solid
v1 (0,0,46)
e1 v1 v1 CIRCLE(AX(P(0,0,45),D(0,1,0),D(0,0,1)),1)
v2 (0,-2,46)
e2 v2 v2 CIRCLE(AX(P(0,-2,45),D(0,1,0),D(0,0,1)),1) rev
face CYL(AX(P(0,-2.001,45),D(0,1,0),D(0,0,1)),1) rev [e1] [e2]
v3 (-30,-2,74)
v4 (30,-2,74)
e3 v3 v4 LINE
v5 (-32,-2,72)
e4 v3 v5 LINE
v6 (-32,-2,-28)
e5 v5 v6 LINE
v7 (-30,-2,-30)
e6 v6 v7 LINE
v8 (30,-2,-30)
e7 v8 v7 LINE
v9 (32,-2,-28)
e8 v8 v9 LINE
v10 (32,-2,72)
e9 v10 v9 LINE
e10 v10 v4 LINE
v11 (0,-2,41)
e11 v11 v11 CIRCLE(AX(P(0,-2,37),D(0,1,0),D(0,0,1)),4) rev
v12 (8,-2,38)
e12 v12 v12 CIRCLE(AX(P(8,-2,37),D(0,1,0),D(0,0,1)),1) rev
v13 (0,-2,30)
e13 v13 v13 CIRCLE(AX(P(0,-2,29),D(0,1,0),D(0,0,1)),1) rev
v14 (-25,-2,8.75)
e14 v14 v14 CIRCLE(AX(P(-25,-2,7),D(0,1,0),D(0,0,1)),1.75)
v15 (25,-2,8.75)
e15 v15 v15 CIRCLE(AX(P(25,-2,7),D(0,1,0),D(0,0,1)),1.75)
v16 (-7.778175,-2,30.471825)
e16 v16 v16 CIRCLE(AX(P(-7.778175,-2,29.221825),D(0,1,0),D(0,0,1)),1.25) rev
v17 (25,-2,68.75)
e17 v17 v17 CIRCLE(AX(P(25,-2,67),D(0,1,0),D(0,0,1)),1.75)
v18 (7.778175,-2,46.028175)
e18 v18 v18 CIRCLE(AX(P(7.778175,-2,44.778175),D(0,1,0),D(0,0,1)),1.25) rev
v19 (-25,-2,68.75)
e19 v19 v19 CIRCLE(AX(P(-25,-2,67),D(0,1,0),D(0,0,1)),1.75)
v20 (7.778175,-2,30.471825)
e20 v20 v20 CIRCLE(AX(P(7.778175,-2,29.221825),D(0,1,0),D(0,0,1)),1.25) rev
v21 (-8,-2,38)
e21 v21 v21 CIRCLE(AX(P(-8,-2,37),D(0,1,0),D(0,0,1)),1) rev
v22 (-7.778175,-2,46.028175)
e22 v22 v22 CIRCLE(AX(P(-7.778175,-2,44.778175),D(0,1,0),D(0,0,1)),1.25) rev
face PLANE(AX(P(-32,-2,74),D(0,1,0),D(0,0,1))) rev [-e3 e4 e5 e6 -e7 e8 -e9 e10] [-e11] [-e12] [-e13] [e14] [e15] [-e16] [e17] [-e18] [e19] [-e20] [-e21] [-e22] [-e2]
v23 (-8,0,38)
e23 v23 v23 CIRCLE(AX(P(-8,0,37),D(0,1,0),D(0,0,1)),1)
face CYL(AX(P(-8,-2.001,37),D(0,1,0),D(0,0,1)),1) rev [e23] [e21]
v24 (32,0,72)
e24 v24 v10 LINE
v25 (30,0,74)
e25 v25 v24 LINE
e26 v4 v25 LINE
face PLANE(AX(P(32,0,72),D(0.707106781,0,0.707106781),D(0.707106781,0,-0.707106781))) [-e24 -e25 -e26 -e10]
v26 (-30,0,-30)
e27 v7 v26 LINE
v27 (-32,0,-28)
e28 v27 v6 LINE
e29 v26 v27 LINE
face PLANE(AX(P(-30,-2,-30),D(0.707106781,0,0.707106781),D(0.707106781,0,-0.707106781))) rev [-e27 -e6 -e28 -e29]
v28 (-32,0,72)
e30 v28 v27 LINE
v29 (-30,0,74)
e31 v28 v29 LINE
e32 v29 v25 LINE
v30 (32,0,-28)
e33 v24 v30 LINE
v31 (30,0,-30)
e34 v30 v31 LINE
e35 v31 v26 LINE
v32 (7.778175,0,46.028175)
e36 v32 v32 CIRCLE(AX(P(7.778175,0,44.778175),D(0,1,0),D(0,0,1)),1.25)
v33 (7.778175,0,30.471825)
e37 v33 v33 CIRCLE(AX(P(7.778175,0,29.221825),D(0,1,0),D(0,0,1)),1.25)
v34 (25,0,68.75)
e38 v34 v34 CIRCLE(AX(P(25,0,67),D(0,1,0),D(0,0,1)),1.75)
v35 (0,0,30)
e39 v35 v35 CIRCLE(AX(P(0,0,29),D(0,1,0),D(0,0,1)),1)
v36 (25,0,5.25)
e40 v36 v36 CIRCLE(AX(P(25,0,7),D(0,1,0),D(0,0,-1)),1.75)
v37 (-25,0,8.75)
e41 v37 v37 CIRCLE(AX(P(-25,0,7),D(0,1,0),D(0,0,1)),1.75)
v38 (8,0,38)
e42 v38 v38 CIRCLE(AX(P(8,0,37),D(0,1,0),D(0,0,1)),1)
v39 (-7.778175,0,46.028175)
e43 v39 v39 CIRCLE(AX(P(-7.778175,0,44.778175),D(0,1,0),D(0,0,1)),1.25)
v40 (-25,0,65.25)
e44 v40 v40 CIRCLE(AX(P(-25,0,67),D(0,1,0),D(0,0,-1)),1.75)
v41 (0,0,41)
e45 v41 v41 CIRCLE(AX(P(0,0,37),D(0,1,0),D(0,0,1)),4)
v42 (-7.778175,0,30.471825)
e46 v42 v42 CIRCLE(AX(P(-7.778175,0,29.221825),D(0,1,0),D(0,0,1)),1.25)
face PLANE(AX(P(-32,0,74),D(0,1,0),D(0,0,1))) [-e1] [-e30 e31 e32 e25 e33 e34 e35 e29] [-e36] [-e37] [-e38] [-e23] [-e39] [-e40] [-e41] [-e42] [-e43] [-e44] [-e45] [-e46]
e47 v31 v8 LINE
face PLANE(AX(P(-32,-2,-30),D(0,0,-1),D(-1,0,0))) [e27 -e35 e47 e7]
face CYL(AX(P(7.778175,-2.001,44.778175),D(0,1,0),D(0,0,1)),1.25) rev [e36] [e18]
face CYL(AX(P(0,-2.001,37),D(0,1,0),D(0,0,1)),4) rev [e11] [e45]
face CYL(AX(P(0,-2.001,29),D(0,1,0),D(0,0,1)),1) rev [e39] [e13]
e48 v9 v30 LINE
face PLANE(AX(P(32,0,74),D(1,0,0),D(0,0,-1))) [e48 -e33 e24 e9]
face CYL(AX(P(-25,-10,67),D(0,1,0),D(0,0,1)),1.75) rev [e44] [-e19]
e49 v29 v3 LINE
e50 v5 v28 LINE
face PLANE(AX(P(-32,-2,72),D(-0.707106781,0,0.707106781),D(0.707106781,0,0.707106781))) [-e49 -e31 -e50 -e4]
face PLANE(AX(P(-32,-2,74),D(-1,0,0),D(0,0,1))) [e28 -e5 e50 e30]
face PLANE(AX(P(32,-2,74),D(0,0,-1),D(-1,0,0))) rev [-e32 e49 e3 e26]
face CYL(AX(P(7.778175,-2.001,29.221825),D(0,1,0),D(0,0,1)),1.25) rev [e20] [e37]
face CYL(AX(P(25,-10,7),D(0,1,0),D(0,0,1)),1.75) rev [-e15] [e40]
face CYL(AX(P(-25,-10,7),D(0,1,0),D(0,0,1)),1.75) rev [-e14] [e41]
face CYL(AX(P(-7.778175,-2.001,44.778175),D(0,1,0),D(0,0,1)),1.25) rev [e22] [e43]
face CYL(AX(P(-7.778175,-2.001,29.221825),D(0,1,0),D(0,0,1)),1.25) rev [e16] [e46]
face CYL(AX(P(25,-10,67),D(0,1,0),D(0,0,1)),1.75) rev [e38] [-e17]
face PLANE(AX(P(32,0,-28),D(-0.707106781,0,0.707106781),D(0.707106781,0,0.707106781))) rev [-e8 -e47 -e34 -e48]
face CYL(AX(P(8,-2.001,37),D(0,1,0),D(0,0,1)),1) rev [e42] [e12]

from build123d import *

# Parameters (mm, degrees)
SKETCH1_W          = 64
SKETCH1_H          = 2
BASE_FLANGE1_DEPTH = 74
SKETCH2_R          = 1.75
CUT_EXTRUDE1_DEPTH = 10
CUT_EXTRUDE2_REACH = 82.647
SKETCH4_R          = 4
CHAMFER1_SIZE      = 2
CUT_EXTRUDE5_REACH = 82.647
SKETCH7_R          = 1
SKETCH7_R_2        = 1.25
SKETCH8_W          = 64
SKETCH8_H          = 30
TAB1_DEPTH         = 2
CHAMFER2_SIZE      = 2


# Sheet-metal steps are written as plain solids
with BuildPart() as part:
    # Sketch1 → Base-Flange1 (new body)
    with BuildSketch(Plane.XY):
        with Locations((0, -1)):
            Rectangle(SKETCH1_W, SKETCH1_H)
    extrude(amount=BASE_FLANGE1_DEPTH)

    # Sketch2 → Cut-Extrude1 (cut)
    with BuildSketch(Plane(origin=(0, 0, 0), x_dir=(1, 0, 0), z_dir=(0, 1, 0))):
        with Locations(Location((-25, -7, 0), (0, 0, 270))):
            Circle(SKETCH2_R)
        with Locations(Location((-25, -67, 0), (0, 0, 270))):
            Circle(SKETCH2_R)
        with Locations(Location((25, -67, 0), (0, 0, 270))):
            Circle(SKETCH2_R)
        with Locations(Location((25, -7, 0), (0, 0, 270))):
            Circle(SKETCH2_R)
    extrude(amount=-CUT_EXTRUDE1_DEPTH, mode=Mode.SUBTRACT)

    # Sketch4 → Cut-Extrude2 (cut, up to next)
    with BuildSketch(Plane(origin=(0, 0, 0), x_dir=(1, 0, 0), z_dir=(0, 1, 0)), mode=Mode.PRIVATE) as cut_extrude2_sk1:
        with Locations(Location((0, -37, 0), (0, 0, 270))):
            Circle(SKETCH4_R)
    cut_extrude2_tool1 = extrude(cut_extrude2_sk1.sketch, amount=-CUT_EXTRUDE2_REACH, mode=Mode.PRIVATE) & part.part
    add(cut_extrude2_tool1.solids().sort_by_distance((0, 0, 37))[0], mode=Mode.SUBTRACT)

    # Chamfer1
    chamfer1_edges = [part.edges().sort_by_distance(p)[0] for p in [
        (-32, -1, 74),
        (32, -1, 74),
    ]]
    chamfer(chamfer1_edges, length=CHAMFER1_SIZE)

    # Sketch7 → Cut-Extrude5 (cut, up to next)
    with BuildSketch(Plane(origin=(0, 0, 0), x_dir=(1, 0, 0), z_dir=(0, 1, 0)), mode=Mode.PRIVATE) as cut_extrude5_sk1:
        with Locations(Location((-8, -37, 0), (0, 0, 270))):
            Circle(SKETCH7_R)
    cut_extrude5_tool1 = extrude(cut_extrude5_sk1.sketch, amount=-CUT_EXTRUDE5_REACH, mode=Mode.PRIVATE) & part.part
    # Sketch7 → Cut-Extrude5 (cut, up to next)
    with BuildSketch(Plane(origin=(0, 0, 0), x_dir=(1, 0, 0), z_dir=(0, 1, 0)), mode=Mode.PRIVATE) as cut_extrude5_sk2:
        with Locations(Location((8, -37, 0), (0, 0, 270))):
            Circle(SKETCH7_R)
    cut_extrude5_tool2 = extrude(cut_extrude5_sk2.sketch, amount=-CUT_EXTRUDE5_REACH, mode=Mode.PRIVATE) & part.part
    # Sketch7 → Cut-Extrude5 (cut, up to next)
    with BuildSketch(Plane(origin=(0, 0, 0), x_dir=(1, 0, 0), z_dir=(0, 1, 0)), mode=Mode.PRIVATE) as cut_extrude5_sk3:
        with Locations(Location((0, -45, 0), (0, 0, 270))):
            Circle(SKETCH7_R)
    cut_extrude5_tool3 = extrude(cut_extrude5_sk3.sketch, amount=-CUT_EXTRUDE5_REACH, mode=Mode.PRIVATE) & part.part
    # Sketch7 → Cut-Extrude5 (cut, up to next)
    with BuildSketch(Plane(origin=(0, 0, 0), x_dir=(1, 0, 0), z_dir=(0, 1, 0)), mode=Mode.PRIVATE) as cut_extrude5_sk4:
        with Locations(Location((0, -29, 0), (0, 0, 270))):
            Circle(SKETCH7_R)
    cut_extrude5_tool4 = extrude(cut_extrude5_sk4.sketch, amount=-CUT_EXTRUDE5_REACH, mode=Mode.PRIVATE) & part.part
    # Sketch7 → Cut-Extrude5 (cut, up to next)
    with BuildSketch(Plane(origin=(0, 0, 0), x_dir=(1, 0, 0), z_dir=(0, 1, 0)), mode=Mode.PRIVATE) as cut_extrude5_sk5:
        with Locations(Location((-7.778174593, -44.778174593, 0), (0, 0, 270))):
            Circle(SKETCH7_R_2)
    cut_extrude5_tool5 = extrude(cut_extrude5_sk5.sketch, amount=-CUT_EXTRUDE5_REACH, mode=Mode.PRIVATE) & part.part
    # Sketch7 → Cut-Extrude5 (cut, up to next)
    with BuildSketch(Plane(origin=(0, 0, 0), x_dir=(1, 0, 0), z_dir=(0, 1, 0)), mode=Mode.PRIVATE) as cut_extrude5_sk6:
        with Locations(Location((-7.778174593, -29.221825407, 0), (0, 0, 270))):
            Circle(SKETCH7_R_2)
    cut_extrude5_tool6 = extrude(cut_extrude5_sk6.sketch, amount=-CUT_EXTRUDE5_REACH, mode=Mode.PRIVATE) & part.part
    # Sketch7 → Cut-Extrude5 (cut, up to next)
    with BuildSketch(Plane(origin=(0, 0, 0), x_dir=(1, 0, 0), z_dir=(0, 1, 0)), mode=Mode.PRIVATE) as cut_extrude5_sk7:
        with Locations(Location((7.778174593, -29.221825407, 0), (0, 0, 270))):
            Circle(SKETCH7_R_2)
    cut_extrude5_tool7 = extrude(cut_extrude5_sk7.sketch, amount=-CUT_EXTRUDE5_REACH, mode=Mode.PRIVATE) & part.part
    # Sketch7 → Cut-Extrude5 (cut, up to next)
    with BuildSketch(Plane(origin=(0, 0, 0), x_dir=(1, 0, 0), z_dir=(0, 1, 0)), mode=Mode.PRIVATE) as cut_extrude5_sk8:
        with Locations(Location((7.778174593, -44.778174593, 0), (0, 0, 270))):
            Circle(SKETCH7_R_2)
    cut_extrude5_tool8 = extrude(cut_extrude5_sk8.sketch, amount=-CUT_EXTRUDE5_REACH, mode=Mode.PRIVATE) & part.part
    add(cut_extrude5_tool1.solids().sort_by_distance((-8, 0, 37))[0], mode=Mode.SUBTRACT)
    add(cut_extrude5_tool2.solids().sort_by_distance((8, 0, 37))[0], mode=Mode.SUBTRACT)
    add(cut_extrude5_tool3.solids().sort_by_distance((0, 0, 45))[0], mode=Mode.SUBTRACT)
    add(cut_extrude5_tool4.solids().sort_by_distance((0, 0, 29))[0], mode=Mode.SUBTRACT)
    add(cut_extrude5_tool5.solids().sort_by_distance((-7.778175, 0, 44.778175))[0], mode=Mode.SUBTRACT)
    add(cut_extrude5_tool6.solids().sort_by_distance((-7.778175, 0, 29.221825))[0], mode=Mode.SUBTRACT)
    add(cut_extrude5_tool7.solids().sort_by_distance((7.778175, 0, 29.221825))[0], mode=Mode.SUBTRACT)
    add(cut_extrude5_tool8.solids().sort_by_distance((7.778175, 0, 44.778175))[0], mode=Mode.SUBTRACT)

    # Sketch8 → Tab1 (add)
    with BuildSketch(Plane(origin=(0, 0, 0), x_dir=(1, 0, 0), z_dir=(0, 1, 0))):
        with Locations((0, 15)):
            Rectangle(SKETCH8_W, SKETCH8_H)
    extrude(amount=-TAB1_DEPTH)

    # Chamfer2
    chamfer2_edges = [part.edges().sort_by_distance(p)[0] for p in [
        (-32, -1, -30),
        (32, -1, -30),
    ]]
    chamfer(chamfer2_edges, length=CHAMFER2_SIZE)


solid = part.part
